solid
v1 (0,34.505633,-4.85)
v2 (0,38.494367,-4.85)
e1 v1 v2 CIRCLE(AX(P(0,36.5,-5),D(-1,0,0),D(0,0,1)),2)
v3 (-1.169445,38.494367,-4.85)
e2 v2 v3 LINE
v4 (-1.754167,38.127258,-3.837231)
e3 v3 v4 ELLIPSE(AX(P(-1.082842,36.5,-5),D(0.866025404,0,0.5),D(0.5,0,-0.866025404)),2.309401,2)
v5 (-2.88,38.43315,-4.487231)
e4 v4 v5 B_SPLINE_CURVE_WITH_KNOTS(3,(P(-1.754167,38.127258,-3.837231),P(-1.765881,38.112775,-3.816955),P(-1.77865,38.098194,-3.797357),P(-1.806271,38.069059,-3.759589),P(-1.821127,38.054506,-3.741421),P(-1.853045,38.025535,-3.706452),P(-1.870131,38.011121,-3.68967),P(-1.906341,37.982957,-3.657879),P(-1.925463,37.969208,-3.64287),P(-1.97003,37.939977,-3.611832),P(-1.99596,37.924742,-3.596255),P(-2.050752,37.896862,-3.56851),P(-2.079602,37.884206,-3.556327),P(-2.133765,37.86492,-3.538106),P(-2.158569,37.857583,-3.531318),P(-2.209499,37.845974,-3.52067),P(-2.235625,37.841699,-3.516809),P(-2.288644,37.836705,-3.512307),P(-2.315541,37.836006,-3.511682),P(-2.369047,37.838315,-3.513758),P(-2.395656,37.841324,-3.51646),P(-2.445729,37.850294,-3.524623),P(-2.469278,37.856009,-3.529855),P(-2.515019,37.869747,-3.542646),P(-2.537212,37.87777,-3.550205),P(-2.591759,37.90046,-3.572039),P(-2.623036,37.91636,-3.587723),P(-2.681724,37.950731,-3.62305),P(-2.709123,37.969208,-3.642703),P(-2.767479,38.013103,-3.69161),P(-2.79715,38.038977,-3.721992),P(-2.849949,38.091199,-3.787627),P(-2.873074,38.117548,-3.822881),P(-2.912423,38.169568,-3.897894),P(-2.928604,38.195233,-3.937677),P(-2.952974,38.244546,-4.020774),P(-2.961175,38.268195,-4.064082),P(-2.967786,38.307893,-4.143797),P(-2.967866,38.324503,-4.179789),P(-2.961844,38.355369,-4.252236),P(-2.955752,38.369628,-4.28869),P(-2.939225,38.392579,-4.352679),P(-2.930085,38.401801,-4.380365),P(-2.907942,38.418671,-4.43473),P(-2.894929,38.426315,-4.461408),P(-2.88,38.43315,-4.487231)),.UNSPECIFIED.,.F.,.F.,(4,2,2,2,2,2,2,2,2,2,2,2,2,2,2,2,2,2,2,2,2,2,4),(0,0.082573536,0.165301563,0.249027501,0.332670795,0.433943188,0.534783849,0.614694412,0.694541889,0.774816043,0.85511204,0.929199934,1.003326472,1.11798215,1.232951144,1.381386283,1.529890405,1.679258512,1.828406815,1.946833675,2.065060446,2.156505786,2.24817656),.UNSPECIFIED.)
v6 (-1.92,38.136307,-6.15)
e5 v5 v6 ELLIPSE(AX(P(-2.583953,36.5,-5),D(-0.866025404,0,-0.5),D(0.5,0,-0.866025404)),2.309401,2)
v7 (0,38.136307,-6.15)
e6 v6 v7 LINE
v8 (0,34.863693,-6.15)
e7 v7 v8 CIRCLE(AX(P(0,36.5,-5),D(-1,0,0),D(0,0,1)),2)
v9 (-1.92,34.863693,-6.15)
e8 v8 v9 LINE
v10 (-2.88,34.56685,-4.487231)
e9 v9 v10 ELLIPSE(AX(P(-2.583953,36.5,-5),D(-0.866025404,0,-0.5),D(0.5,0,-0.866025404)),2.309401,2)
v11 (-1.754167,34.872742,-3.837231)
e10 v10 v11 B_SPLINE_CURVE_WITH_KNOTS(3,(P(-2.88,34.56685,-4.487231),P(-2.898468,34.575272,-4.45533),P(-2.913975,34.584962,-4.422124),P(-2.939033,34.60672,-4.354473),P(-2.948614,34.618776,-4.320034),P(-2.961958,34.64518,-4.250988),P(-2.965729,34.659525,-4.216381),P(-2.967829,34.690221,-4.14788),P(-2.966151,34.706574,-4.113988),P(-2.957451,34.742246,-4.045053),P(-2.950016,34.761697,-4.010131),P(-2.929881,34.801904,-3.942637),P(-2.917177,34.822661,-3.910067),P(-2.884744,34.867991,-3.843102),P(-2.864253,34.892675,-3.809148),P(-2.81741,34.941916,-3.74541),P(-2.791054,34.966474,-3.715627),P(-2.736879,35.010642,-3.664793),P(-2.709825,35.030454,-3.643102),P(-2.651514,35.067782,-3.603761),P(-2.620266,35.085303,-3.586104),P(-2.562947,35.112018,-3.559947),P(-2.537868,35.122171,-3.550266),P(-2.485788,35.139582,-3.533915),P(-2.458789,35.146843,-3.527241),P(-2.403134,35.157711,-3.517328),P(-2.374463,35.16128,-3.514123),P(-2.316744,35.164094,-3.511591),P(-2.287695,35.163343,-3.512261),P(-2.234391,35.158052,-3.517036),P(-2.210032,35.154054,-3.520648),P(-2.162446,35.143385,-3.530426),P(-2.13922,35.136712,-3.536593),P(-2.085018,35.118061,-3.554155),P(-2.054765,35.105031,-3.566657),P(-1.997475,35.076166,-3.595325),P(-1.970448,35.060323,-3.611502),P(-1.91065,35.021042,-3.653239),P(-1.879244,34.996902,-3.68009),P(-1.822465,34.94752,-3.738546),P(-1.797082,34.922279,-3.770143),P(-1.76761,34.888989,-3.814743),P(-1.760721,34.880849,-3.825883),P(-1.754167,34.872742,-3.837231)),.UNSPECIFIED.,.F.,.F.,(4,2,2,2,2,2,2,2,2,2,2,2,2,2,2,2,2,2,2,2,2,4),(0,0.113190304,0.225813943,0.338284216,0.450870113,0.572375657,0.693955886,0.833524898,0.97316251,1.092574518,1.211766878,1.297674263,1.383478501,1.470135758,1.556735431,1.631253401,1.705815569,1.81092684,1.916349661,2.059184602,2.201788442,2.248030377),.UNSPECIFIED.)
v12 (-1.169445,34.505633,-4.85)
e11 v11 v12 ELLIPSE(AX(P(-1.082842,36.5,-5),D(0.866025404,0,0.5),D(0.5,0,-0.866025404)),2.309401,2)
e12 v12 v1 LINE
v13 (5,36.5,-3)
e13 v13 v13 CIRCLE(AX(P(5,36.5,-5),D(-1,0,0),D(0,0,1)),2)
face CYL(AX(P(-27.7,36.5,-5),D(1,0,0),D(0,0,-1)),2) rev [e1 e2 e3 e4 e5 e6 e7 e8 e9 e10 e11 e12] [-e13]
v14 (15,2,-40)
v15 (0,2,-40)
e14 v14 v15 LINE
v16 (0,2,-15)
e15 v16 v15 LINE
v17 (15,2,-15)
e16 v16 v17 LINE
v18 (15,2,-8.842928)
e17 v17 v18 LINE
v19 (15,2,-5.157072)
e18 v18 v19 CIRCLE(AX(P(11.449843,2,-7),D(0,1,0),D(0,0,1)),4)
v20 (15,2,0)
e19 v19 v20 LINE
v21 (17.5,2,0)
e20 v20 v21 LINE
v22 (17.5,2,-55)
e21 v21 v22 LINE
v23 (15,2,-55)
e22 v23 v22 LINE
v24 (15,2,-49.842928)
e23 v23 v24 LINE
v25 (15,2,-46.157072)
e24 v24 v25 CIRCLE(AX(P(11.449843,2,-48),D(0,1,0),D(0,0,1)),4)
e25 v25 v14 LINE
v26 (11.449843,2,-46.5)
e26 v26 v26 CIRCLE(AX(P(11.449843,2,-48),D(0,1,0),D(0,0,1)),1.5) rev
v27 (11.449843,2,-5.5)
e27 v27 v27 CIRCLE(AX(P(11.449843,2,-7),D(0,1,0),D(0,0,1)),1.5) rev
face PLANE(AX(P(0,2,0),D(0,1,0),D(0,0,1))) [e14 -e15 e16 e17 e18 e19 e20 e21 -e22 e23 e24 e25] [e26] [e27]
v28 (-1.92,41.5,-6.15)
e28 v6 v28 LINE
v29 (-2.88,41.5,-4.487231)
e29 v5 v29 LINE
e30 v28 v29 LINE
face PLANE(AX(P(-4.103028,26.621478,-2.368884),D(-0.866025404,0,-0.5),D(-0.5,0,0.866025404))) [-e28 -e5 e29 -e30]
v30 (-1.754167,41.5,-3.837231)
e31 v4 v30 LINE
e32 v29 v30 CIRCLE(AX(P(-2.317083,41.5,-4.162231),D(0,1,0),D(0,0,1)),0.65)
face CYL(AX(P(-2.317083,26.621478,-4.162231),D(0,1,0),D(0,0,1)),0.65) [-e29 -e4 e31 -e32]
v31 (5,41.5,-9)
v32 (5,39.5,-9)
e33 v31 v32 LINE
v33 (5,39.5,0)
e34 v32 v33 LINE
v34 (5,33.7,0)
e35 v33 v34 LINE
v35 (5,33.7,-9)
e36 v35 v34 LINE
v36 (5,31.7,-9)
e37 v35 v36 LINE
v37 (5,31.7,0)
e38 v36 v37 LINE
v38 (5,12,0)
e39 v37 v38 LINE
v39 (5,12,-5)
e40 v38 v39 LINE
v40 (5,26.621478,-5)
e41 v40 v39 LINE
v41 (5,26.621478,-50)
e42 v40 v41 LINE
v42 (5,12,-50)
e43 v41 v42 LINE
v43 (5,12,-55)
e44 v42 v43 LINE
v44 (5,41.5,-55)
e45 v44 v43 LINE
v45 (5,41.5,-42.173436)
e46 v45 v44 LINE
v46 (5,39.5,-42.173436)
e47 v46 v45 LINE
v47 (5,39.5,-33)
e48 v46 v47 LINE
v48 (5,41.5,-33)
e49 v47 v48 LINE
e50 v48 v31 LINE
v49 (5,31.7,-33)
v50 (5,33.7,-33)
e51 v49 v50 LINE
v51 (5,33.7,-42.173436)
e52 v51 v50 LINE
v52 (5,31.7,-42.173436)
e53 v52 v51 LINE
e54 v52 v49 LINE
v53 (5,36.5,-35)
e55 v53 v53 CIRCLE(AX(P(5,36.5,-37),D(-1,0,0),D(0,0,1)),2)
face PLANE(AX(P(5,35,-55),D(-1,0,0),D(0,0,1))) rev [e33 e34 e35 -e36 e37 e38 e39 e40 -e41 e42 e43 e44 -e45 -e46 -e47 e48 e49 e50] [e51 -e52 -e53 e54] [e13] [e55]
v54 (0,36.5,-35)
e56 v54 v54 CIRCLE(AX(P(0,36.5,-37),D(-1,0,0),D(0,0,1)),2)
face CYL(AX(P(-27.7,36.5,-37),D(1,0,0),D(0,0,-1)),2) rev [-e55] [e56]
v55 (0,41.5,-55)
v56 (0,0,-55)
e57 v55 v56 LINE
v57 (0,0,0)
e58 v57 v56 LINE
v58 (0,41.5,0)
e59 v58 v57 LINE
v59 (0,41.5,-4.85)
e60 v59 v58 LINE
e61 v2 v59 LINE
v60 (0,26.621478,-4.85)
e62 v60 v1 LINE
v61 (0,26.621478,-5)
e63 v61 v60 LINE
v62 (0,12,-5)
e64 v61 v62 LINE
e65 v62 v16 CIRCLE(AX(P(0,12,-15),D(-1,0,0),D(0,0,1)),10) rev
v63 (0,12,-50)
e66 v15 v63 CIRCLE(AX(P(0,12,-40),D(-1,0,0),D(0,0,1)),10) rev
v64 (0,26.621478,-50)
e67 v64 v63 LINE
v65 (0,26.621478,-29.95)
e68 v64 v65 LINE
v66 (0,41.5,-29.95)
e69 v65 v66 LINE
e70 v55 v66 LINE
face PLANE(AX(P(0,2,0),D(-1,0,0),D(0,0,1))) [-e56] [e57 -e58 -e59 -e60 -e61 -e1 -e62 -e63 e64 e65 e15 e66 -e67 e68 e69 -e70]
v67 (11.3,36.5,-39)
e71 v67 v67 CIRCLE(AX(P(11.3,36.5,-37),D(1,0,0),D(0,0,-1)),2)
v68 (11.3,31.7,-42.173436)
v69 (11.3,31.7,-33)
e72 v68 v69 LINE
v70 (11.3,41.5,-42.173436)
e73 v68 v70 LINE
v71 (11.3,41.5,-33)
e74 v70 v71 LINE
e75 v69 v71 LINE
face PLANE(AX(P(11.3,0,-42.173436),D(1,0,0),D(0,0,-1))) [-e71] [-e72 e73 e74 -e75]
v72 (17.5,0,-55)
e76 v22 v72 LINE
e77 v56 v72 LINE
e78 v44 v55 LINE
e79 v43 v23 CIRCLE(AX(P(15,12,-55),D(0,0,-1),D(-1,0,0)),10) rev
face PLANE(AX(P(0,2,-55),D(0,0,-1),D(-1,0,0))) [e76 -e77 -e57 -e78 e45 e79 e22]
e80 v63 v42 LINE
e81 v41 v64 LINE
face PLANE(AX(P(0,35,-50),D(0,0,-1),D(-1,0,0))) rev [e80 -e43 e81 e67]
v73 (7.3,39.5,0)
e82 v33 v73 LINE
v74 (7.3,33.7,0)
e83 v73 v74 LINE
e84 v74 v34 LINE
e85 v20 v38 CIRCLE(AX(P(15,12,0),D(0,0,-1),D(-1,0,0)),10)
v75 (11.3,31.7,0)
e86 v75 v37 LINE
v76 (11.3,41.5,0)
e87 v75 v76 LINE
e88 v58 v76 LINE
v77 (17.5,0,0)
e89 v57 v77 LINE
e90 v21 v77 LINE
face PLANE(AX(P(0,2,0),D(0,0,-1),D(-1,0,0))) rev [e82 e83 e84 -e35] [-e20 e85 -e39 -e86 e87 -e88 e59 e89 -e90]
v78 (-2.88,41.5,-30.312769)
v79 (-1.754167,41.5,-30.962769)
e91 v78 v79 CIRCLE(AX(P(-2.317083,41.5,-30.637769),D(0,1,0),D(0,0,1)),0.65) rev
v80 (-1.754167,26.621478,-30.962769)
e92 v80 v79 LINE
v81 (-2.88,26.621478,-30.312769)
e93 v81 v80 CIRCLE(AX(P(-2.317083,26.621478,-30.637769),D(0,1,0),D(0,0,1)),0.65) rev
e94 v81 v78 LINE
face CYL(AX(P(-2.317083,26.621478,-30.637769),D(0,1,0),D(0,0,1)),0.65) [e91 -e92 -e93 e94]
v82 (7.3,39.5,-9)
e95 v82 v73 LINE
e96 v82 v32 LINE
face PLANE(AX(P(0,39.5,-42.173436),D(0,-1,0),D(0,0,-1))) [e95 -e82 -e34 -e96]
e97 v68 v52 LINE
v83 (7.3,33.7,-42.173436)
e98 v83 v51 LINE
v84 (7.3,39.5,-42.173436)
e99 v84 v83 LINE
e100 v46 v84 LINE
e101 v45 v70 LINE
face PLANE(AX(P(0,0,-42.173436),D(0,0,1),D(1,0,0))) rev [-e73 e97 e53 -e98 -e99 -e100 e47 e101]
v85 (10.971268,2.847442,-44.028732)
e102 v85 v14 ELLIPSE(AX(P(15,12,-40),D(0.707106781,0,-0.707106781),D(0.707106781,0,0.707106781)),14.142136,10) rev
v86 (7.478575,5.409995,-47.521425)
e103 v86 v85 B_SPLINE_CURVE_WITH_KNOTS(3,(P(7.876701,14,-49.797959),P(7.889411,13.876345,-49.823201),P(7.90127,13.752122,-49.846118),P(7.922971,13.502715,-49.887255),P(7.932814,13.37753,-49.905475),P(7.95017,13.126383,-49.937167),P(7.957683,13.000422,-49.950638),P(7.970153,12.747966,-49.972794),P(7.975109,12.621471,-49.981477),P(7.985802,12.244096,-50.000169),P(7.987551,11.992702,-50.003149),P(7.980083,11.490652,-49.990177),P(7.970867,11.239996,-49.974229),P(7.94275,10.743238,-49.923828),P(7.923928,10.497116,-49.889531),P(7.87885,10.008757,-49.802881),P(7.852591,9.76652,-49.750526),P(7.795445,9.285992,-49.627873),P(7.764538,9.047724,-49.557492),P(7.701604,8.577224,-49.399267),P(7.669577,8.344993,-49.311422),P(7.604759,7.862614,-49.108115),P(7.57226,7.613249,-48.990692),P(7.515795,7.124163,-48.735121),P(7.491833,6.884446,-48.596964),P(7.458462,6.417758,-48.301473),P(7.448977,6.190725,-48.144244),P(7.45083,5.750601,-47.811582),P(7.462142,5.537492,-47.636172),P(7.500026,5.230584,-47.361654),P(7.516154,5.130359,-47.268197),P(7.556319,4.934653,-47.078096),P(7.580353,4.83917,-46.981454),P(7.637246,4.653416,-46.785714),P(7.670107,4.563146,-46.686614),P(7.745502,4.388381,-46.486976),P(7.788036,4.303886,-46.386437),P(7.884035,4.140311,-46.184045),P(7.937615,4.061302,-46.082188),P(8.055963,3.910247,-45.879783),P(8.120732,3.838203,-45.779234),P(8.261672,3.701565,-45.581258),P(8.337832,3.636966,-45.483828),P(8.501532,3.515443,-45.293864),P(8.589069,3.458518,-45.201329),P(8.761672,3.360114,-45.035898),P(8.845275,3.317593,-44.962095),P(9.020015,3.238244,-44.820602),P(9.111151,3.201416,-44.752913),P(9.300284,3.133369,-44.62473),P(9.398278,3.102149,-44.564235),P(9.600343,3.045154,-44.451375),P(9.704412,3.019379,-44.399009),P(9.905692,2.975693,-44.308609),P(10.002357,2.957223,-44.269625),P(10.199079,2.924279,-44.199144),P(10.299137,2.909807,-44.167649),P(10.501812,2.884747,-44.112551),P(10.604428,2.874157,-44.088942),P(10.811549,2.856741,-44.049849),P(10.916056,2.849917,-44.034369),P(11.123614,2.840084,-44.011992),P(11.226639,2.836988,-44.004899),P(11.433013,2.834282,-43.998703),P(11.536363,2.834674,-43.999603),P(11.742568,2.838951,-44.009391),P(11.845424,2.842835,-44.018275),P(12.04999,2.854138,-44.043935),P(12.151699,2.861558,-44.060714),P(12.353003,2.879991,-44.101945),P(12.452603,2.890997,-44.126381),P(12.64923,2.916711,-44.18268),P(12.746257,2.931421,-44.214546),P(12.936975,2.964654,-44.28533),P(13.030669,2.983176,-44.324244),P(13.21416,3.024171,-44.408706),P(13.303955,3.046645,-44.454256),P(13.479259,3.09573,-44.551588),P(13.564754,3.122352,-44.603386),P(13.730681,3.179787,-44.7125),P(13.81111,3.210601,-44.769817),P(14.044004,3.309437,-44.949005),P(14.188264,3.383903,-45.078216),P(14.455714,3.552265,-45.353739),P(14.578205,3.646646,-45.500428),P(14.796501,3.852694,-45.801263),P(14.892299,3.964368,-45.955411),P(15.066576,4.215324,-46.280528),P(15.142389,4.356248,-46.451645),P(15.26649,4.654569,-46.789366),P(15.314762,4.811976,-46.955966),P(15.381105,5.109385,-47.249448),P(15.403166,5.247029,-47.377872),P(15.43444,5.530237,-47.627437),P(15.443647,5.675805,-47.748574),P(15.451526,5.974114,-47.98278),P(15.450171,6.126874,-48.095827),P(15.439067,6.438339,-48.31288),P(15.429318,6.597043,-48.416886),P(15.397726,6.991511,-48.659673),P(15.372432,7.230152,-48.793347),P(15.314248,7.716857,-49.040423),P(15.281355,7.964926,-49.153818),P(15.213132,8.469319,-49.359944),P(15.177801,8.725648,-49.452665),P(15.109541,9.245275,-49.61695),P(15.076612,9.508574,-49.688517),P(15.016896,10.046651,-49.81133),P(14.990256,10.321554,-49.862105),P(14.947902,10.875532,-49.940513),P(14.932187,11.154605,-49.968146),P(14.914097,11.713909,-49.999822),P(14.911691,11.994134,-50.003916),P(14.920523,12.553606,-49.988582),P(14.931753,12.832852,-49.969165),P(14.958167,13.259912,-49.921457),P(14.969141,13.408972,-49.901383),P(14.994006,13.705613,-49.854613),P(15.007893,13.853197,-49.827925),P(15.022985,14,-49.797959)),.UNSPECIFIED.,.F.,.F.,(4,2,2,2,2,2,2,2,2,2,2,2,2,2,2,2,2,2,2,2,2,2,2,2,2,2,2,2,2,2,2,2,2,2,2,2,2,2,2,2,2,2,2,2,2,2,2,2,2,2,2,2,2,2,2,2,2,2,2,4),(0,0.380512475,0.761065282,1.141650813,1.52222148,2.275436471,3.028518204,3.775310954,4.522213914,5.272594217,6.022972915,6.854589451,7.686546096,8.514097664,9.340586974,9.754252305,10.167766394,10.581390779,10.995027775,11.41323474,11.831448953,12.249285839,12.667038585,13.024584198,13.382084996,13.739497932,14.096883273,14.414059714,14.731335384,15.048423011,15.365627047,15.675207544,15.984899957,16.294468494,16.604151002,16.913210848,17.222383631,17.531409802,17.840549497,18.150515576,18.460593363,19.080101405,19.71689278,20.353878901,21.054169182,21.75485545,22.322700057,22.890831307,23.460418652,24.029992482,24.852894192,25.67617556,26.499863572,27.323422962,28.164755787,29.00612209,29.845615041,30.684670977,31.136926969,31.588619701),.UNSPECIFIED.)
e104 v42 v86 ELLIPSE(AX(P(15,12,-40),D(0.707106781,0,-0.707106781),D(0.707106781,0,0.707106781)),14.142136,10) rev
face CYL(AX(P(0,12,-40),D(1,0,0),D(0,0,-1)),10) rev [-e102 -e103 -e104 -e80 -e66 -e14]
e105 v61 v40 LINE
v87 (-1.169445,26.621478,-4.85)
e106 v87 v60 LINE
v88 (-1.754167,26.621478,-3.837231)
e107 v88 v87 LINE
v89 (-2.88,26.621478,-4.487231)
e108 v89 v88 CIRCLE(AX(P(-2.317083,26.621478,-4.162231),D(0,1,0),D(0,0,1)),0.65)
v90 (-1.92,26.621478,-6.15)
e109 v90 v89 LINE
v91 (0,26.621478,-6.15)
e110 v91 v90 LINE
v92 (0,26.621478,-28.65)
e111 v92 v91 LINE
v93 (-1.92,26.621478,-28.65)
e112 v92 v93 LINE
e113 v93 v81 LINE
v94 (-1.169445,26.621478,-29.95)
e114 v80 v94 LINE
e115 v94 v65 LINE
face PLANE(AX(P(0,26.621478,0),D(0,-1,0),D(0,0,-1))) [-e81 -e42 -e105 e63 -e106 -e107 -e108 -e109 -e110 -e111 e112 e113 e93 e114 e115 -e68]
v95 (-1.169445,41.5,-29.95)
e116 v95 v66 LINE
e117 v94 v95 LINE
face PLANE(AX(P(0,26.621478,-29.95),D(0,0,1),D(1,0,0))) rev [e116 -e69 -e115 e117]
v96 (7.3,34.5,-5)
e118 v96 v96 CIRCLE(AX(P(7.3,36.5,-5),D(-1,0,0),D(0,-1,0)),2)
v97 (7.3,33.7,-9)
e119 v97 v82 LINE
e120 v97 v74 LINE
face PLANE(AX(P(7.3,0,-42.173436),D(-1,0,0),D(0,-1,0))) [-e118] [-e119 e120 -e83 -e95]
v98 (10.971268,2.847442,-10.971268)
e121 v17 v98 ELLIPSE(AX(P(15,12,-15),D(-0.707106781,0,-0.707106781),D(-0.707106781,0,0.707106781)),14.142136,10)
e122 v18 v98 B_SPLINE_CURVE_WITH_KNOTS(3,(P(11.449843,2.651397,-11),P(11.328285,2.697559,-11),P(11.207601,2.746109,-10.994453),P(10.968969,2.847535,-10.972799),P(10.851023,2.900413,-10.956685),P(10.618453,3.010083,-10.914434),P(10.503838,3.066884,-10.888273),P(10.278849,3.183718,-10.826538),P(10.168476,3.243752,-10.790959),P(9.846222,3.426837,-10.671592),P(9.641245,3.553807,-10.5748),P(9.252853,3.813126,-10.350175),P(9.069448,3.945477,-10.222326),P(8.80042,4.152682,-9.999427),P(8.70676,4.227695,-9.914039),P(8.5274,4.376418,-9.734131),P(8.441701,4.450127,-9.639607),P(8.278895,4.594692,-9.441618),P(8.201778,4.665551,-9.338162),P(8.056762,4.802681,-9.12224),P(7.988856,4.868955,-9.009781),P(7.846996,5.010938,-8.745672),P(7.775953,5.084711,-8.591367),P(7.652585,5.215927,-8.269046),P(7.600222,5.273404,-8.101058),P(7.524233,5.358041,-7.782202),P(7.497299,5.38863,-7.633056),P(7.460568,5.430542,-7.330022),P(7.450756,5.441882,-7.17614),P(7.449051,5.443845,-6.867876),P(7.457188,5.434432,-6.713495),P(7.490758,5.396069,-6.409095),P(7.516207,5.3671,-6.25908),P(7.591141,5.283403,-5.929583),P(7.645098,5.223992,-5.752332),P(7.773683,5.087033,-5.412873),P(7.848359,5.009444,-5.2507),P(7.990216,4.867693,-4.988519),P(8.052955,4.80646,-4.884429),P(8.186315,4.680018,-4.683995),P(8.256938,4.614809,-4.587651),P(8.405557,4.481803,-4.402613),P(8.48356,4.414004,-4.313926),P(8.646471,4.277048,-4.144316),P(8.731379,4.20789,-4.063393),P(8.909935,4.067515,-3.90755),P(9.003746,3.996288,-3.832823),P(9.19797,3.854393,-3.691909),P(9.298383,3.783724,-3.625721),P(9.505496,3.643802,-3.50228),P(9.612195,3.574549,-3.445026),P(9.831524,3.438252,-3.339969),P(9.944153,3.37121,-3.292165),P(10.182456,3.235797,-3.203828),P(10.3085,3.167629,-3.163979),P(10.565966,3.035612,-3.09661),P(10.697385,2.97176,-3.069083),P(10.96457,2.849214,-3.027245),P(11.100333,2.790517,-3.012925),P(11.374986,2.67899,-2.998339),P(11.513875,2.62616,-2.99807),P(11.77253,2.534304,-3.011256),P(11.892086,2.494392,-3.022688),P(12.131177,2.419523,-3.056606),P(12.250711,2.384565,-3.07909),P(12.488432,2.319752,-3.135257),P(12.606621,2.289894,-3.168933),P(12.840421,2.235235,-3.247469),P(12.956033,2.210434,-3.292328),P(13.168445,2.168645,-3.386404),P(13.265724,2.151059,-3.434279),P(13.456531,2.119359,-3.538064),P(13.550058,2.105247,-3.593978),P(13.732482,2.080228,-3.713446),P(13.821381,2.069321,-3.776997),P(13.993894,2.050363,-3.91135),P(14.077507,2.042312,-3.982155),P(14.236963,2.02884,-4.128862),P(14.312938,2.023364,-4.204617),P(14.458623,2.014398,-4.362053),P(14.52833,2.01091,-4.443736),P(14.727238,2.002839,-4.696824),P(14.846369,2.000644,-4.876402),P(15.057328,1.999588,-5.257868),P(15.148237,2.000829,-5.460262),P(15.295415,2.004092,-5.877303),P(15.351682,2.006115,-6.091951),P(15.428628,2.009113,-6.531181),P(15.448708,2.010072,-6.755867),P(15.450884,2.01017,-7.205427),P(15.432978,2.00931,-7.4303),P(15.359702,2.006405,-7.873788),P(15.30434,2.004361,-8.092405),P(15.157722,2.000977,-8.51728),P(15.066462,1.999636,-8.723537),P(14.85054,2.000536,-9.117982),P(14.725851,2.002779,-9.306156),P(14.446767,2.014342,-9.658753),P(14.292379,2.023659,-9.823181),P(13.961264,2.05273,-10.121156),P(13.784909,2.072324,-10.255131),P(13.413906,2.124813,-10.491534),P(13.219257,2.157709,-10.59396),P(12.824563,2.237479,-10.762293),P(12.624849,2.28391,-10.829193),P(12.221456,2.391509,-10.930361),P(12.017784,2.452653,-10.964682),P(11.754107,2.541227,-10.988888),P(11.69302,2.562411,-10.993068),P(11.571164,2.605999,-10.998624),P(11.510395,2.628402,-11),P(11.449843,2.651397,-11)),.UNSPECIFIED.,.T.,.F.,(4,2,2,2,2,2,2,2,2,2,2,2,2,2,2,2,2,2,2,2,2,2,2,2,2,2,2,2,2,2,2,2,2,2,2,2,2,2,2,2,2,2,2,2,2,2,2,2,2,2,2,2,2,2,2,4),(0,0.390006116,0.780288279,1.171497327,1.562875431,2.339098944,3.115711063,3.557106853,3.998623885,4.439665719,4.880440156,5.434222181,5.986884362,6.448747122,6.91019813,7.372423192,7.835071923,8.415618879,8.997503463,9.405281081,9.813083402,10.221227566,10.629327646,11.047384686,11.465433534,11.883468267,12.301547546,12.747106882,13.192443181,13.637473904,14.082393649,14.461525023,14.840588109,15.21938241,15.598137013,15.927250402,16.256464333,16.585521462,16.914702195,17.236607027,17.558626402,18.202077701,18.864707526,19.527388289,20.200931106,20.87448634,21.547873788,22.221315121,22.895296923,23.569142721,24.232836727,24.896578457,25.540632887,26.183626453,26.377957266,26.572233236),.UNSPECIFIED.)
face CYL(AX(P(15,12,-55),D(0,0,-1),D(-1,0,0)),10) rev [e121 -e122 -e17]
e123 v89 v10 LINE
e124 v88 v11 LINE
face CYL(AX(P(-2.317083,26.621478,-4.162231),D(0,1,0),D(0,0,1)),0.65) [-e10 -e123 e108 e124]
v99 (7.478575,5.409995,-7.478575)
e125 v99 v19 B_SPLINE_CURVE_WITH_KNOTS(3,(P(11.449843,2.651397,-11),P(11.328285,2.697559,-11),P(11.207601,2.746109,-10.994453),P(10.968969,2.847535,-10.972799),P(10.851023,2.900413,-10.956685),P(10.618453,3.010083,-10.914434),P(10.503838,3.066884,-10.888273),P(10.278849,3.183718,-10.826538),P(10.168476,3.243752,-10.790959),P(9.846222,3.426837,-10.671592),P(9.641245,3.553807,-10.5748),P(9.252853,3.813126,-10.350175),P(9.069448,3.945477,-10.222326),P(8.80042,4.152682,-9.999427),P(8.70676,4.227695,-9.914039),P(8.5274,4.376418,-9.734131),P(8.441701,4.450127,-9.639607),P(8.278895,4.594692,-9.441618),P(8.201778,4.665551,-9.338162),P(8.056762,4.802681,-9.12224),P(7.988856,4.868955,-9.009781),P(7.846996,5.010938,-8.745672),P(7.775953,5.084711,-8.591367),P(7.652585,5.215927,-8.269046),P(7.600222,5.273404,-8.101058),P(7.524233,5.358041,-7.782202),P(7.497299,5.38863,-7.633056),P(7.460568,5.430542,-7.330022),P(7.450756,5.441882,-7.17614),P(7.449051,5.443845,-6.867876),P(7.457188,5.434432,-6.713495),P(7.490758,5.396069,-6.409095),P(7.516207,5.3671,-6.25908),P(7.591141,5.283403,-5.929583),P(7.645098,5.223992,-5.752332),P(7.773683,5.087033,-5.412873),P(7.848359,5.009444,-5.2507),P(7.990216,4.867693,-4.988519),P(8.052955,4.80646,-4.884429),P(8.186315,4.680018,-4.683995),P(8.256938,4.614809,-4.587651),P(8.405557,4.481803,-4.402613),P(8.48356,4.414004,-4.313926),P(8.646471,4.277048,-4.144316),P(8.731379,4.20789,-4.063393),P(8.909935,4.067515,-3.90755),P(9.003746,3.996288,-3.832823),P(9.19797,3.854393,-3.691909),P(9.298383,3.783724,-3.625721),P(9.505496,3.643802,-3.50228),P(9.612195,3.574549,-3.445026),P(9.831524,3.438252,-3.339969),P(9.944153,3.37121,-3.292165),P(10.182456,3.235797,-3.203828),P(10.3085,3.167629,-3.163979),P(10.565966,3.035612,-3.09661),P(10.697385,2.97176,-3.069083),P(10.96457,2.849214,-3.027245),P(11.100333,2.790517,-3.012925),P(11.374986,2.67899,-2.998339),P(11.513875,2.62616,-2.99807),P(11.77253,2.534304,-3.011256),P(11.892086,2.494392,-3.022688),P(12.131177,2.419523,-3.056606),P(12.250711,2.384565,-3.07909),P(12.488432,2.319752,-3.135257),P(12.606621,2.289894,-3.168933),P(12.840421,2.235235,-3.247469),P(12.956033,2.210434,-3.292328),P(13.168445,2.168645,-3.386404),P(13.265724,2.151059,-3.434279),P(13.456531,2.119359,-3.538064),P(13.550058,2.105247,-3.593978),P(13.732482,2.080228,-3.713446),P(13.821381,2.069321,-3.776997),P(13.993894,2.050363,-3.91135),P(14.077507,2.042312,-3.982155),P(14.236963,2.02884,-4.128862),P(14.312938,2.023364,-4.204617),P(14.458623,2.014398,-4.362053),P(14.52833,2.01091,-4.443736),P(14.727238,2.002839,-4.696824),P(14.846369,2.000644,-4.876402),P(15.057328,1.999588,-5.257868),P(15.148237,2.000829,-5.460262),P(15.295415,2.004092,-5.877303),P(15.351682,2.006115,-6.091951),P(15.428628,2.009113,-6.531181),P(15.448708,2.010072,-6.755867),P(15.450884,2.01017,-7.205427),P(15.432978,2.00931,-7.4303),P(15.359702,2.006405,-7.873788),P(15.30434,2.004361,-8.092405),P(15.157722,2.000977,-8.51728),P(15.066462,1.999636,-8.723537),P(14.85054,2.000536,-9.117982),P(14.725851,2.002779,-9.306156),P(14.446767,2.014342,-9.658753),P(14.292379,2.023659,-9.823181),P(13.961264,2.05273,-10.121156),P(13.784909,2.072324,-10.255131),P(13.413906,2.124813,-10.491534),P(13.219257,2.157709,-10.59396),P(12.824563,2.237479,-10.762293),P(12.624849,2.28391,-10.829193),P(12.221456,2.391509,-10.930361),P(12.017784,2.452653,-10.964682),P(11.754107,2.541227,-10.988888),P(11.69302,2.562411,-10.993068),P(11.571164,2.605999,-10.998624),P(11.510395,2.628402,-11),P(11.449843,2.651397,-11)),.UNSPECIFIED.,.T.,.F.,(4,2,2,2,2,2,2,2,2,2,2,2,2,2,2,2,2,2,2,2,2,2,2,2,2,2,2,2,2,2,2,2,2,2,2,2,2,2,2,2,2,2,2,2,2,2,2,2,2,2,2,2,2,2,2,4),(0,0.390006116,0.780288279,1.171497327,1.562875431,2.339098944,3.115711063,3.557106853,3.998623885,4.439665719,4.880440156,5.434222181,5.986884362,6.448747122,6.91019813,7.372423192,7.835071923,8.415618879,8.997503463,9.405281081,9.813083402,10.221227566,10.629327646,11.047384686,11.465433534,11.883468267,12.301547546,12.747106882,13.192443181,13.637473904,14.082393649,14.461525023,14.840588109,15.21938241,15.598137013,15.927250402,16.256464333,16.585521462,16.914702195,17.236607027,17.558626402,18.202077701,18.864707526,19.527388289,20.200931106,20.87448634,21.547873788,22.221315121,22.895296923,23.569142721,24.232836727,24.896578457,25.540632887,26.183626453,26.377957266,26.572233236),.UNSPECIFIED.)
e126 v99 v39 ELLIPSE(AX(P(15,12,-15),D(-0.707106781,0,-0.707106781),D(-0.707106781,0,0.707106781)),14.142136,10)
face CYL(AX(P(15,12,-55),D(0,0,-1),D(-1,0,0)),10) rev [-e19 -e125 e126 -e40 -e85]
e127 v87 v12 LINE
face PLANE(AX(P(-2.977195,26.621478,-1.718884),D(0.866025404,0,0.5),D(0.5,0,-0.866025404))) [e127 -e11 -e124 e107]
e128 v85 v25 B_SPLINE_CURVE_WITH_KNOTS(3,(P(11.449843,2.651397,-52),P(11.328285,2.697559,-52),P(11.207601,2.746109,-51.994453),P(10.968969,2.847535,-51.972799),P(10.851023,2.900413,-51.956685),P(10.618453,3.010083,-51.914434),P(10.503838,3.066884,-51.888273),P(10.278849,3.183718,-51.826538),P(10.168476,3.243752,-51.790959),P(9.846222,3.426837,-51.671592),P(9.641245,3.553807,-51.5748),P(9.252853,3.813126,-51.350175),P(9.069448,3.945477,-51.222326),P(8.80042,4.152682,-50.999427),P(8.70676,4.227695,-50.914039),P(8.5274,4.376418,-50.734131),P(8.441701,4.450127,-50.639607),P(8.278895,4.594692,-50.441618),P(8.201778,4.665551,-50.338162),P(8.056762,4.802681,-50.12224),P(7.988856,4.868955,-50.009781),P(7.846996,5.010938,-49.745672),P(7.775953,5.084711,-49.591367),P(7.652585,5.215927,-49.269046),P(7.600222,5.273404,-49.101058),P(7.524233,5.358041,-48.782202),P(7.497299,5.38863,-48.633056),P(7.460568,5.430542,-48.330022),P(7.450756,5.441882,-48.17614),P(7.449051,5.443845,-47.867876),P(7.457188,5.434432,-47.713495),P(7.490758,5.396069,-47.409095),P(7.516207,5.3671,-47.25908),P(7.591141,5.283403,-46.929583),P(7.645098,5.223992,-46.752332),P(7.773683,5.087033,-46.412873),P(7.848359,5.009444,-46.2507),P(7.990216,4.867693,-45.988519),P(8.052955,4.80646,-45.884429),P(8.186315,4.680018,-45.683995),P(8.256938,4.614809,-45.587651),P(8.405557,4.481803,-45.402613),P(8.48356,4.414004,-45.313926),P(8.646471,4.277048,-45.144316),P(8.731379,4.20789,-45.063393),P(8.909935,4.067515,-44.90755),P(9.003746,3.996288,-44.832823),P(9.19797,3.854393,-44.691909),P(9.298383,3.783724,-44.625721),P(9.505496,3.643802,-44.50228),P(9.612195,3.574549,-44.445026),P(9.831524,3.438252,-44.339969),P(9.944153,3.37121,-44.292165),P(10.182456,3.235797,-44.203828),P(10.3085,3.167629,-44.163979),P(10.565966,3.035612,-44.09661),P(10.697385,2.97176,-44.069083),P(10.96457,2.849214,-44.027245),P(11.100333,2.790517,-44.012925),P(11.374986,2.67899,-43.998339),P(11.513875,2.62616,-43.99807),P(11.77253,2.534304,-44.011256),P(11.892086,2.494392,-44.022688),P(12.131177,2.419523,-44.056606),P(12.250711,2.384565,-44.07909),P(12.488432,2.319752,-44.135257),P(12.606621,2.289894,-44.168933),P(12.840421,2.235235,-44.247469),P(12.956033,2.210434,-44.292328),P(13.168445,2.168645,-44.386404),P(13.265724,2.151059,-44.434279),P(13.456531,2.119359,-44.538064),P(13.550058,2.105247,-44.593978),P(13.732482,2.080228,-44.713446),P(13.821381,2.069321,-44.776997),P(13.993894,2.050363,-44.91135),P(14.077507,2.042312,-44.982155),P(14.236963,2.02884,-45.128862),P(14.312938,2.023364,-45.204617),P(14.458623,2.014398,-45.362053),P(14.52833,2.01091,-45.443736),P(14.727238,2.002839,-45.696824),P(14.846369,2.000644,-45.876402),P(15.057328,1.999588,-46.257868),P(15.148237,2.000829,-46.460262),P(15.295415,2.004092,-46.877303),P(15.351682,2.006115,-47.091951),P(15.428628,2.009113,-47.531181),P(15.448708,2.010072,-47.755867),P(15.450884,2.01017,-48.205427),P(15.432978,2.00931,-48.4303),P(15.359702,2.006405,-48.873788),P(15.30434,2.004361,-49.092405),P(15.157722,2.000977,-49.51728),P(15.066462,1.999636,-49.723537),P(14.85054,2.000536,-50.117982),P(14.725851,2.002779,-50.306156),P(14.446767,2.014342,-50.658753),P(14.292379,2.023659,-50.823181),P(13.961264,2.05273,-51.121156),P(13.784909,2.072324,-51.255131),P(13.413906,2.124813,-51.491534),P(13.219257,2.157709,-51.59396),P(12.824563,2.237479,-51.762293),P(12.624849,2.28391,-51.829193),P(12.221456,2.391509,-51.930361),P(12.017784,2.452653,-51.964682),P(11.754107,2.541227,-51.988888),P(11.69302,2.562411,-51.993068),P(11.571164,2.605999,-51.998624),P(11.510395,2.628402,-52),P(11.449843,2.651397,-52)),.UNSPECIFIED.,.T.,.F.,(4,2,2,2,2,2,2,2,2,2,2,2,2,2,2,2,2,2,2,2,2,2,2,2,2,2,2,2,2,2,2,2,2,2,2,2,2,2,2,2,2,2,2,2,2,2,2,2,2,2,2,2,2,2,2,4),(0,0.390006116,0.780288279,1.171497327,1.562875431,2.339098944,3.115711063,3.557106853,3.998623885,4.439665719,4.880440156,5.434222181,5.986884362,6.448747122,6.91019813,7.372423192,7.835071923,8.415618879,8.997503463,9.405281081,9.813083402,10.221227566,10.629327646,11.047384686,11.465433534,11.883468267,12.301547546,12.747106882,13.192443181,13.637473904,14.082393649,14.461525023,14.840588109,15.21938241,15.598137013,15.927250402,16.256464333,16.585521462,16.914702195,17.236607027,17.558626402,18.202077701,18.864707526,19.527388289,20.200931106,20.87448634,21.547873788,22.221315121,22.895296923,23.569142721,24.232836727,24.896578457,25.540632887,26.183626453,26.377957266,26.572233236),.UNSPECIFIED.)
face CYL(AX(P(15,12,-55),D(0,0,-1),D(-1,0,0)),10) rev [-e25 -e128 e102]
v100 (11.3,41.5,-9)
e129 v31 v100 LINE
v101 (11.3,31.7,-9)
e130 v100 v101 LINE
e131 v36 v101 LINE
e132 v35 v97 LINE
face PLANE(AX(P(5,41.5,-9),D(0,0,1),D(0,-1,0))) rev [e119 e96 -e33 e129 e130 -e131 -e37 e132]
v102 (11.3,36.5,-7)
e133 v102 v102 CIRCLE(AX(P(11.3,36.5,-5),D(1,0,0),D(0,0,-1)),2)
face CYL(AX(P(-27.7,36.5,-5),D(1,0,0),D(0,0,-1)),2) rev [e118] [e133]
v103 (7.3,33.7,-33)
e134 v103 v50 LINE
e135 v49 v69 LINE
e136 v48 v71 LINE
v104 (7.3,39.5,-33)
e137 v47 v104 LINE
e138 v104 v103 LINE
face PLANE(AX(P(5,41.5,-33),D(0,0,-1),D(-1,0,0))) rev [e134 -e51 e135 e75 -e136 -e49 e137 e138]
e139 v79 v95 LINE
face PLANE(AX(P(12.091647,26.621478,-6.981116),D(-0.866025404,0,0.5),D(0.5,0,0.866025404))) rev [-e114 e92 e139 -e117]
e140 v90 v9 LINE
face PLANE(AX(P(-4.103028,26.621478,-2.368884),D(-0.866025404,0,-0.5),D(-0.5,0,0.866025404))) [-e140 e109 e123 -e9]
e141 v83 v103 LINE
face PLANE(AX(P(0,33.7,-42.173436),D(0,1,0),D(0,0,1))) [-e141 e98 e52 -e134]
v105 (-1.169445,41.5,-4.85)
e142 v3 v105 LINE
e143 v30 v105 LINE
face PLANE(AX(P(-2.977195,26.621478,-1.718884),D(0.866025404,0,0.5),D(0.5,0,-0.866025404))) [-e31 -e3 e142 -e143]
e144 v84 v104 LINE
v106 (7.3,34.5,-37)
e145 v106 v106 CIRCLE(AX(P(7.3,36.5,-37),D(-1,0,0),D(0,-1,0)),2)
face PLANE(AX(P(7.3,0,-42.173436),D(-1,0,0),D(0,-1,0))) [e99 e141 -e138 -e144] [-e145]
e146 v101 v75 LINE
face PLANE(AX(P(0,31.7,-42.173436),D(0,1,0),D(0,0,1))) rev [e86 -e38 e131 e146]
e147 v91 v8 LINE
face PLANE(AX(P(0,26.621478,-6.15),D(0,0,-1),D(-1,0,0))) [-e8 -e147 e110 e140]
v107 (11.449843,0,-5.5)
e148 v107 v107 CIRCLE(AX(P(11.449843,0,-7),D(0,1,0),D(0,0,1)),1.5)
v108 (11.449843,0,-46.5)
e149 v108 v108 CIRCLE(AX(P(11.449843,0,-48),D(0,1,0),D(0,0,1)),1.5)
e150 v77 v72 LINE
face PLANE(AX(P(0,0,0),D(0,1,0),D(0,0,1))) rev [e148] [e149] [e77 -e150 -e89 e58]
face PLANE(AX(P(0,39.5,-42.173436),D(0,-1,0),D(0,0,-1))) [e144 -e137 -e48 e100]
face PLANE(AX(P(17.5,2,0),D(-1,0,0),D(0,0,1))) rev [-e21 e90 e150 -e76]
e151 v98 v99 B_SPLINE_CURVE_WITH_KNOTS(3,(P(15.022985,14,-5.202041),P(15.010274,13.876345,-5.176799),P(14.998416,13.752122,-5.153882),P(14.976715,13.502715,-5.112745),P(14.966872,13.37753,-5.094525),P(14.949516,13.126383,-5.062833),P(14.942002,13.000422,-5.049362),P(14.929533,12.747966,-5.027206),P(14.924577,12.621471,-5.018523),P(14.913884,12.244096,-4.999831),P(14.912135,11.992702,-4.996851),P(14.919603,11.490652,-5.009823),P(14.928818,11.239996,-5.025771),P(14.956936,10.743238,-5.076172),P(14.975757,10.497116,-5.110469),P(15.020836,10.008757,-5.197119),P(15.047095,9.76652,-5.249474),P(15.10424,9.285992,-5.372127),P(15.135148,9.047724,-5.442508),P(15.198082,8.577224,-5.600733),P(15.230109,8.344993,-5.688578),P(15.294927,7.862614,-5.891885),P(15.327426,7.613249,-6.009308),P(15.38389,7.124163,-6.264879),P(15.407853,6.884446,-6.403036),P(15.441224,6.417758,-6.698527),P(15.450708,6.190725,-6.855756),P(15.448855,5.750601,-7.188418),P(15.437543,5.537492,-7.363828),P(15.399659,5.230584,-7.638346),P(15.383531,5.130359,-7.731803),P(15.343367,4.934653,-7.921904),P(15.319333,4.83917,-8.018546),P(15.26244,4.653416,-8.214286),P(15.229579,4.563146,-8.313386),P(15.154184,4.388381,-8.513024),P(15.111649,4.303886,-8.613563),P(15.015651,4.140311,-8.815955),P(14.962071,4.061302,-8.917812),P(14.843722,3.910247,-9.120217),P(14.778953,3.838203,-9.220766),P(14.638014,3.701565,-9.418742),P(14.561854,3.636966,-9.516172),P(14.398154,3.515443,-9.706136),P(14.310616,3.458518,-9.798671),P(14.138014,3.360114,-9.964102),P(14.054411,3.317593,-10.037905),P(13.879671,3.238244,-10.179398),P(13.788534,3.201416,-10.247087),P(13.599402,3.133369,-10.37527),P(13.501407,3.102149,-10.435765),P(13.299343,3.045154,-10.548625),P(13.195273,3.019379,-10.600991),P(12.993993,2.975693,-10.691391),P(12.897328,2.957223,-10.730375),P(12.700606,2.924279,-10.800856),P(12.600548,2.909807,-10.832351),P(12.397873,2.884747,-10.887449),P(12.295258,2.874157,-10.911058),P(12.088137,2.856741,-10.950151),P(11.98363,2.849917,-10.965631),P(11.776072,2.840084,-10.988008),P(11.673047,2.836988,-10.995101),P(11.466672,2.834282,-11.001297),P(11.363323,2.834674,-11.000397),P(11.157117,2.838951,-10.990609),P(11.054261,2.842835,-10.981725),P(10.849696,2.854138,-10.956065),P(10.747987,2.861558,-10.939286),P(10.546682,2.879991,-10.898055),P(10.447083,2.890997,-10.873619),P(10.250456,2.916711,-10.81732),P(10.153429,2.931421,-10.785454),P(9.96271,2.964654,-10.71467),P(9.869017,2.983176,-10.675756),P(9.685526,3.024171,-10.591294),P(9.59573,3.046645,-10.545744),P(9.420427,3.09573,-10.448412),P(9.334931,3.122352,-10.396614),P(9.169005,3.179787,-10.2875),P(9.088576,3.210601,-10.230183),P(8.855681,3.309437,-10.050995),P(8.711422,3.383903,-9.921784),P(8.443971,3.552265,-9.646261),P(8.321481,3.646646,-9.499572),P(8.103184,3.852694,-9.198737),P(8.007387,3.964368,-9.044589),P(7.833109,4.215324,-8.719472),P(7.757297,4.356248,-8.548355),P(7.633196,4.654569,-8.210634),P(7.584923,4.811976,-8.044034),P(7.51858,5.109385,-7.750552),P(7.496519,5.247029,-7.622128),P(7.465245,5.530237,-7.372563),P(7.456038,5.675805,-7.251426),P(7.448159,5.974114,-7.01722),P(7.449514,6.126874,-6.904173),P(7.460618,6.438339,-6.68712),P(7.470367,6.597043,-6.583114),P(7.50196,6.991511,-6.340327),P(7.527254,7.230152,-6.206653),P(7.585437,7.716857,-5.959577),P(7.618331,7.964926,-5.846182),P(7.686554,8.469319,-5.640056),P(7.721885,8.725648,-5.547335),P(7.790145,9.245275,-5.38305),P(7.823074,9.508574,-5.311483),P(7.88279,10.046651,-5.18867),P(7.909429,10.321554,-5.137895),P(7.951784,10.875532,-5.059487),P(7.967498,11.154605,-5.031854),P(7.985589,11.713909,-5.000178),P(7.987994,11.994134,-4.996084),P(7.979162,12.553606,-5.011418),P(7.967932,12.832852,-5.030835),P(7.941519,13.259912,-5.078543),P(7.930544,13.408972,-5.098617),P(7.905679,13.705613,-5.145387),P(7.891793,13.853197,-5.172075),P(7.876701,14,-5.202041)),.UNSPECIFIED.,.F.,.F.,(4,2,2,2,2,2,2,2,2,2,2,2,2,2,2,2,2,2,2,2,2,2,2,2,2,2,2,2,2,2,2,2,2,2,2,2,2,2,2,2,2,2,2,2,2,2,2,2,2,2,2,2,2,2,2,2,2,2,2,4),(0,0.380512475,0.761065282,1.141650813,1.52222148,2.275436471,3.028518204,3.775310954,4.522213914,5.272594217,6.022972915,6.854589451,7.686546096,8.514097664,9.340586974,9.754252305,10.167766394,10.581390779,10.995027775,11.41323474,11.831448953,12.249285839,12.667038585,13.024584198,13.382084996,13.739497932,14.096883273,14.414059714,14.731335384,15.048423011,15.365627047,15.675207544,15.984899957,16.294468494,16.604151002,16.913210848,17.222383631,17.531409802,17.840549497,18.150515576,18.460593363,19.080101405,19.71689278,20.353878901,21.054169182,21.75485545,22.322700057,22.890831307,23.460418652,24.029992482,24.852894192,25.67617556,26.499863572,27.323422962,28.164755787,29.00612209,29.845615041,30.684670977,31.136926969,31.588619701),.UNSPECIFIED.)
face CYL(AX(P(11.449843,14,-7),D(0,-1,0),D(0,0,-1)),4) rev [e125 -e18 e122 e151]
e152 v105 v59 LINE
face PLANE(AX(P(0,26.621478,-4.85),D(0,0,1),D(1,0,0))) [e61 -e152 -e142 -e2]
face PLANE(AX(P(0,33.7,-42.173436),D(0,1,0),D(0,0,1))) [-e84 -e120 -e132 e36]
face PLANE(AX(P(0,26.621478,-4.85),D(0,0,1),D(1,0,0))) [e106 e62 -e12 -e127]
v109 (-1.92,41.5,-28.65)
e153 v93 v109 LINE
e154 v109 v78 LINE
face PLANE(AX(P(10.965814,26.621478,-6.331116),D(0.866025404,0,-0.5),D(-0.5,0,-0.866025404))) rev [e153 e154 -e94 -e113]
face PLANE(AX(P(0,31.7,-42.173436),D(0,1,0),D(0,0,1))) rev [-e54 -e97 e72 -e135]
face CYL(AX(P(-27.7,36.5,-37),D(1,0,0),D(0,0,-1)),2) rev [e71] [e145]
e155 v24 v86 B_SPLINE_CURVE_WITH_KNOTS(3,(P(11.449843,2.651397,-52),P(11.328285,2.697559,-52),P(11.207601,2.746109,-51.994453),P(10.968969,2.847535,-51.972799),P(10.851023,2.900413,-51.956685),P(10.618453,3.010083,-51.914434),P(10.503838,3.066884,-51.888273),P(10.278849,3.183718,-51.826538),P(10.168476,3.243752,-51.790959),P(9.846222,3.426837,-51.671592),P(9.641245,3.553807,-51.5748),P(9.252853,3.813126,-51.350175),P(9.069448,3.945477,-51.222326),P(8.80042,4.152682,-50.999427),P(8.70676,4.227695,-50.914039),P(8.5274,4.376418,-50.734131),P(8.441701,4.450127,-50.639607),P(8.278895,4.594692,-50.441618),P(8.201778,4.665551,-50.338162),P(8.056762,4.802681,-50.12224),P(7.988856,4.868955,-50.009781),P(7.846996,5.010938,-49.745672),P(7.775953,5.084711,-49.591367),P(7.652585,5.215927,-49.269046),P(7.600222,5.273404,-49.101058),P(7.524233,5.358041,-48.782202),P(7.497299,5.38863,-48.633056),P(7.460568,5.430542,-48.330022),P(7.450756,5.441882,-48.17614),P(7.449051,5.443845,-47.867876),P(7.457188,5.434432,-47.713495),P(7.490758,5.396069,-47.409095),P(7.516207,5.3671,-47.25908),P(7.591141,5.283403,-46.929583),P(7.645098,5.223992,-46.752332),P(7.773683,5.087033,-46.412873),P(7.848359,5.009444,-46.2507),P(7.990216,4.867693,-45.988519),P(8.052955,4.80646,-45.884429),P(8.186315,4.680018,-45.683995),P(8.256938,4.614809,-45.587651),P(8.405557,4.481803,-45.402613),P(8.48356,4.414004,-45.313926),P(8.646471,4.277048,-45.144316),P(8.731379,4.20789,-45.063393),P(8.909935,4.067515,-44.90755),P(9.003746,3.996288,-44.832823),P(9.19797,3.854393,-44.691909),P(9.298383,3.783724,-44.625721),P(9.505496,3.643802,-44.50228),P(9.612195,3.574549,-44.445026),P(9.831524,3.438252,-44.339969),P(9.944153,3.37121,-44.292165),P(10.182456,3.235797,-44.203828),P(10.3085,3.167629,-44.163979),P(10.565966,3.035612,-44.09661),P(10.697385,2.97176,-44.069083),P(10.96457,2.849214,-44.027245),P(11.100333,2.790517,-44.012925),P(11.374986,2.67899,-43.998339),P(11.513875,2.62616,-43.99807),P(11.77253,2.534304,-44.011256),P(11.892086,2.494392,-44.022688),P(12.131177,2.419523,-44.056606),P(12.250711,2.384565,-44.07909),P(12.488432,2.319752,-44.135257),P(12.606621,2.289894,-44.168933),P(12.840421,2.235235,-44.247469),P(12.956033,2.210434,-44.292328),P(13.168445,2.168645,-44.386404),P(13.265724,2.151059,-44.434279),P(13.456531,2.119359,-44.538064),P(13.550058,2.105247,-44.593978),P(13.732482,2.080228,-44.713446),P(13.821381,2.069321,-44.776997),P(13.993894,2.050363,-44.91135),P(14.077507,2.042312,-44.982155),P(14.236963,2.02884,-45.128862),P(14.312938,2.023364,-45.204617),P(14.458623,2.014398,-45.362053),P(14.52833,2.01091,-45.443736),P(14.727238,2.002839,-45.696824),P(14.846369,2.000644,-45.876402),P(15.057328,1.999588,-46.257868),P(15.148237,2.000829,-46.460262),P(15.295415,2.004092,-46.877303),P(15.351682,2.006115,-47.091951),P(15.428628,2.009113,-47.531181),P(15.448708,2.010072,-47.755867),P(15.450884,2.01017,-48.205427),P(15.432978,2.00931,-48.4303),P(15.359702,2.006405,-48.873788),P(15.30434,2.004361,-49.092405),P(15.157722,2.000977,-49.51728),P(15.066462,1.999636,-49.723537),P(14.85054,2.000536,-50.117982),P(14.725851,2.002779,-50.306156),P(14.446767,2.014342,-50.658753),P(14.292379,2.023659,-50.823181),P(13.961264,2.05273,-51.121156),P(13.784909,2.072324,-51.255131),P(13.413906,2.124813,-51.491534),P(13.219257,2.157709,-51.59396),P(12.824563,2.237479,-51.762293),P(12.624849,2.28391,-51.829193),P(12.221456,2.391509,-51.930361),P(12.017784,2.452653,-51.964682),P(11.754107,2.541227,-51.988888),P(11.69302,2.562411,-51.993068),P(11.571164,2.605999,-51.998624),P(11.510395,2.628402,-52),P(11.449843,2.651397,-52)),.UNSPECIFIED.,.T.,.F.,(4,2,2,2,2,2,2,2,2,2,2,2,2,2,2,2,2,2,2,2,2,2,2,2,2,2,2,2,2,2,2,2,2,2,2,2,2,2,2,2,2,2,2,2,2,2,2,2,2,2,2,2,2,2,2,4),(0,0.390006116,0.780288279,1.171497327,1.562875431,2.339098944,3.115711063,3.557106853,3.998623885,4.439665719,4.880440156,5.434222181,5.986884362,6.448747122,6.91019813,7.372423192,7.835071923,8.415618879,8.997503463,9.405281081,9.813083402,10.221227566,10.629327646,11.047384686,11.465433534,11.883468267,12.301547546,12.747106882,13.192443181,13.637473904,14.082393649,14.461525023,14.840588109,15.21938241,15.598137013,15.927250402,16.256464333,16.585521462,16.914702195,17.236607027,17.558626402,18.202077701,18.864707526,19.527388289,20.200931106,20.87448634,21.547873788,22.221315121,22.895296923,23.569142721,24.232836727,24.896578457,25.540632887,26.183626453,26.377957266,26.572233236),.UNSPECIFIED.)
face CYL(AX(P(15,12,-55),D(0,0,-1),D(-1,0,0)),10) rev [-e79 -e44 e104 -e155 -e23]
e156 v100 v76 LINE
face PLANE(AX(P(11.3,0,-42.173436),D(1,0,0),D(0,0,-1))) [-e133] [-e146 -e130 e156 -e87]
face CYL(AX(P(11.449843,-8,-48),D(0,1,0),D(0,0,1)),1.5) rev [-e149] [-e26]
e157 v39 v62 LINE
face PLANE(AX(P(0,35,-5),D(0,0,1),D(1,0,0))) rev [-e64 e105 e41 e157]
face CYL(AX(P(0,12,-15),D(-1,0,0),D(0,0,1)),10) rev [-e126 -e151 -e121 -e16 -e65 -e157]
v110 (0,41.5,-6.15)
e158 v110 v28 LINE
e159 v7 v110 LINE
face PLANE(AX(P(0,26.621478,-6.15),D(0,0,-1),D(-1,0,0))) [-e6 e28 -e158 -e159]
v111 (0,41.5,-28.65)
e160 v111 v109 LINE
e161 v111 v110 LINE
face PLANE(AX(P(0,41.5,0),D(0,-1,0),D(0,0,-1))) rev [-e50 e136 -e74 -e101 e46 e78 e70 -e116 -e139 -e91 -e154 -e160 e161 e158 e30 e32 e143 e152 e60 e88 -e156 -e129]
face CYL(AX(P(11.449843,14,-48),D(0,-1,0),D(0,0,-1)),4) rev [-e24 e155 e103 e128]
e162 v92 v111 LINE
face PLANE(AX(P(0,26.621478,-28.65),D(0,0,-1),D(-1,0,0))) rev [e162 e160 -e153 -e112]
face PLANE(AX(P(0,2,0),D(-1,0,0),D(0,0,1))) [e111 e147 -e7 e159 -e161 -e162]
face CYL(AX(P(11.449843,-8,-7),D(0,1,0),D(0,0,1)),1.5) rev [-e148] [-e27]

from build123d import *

# Parameters (mm, degrees)
SKETCH_1_W               = 17.5
SKETCH_1_H               = 55
EXTRUDE_1_DEPTH          = 2
SKETCH_2_W               = 5
SKETCH_2_H               = 5
EXTRUDE_2_DEPTH          = 33
EXTRUDE_3_DEPTH          = 6.5
EXTRUDE_3_DEPTH_BACK     = 8.378522314
SKETCH_3_W               = 5
SKETCH_3_H               = 55
SKETCH_4_R               = 1.5
CUT_EXTRUDE_1_DEPTH      = 10
FILLET_1_R               = 10
SKETCH_5_R               = 4
CUT_EXTRUDE_2_DEPTH      = 12
EXTRUDE_START            = -14.878522
EXTRUDE_4_DEPTH          = 14.878522
SKETCH_7_W               = 4
SKETCH_7_H               = 2
SKETCH_7_W_2             = 2.3
SKETCH_7_H_2             = 5.8
EXTRUDE_5_DEPTH          = 42.173435595
SKETCH_9_R               = 2
CUT_EXTRUDE_15_DEPTH     = 39
CUT_EXTRUDE_START        = -6.3
CUT_EXTRUDE_16_OUTLINE_W = 24
CUT_EXTRUDE_16_OUTLINE_H = 9.8
CUT_EXTRUDE_16_DEPTH     = 6.3


# Read off the part's stored shape, not the designer's step: Вырез-Вытянуть16
with BuildPart() as part:
    # Эскиз1 → Бобышка-Вытянуть1 (new body)
    with BuildSketch(Plane(origin=(0, 0, 0), x_dir=(1, 0, 0), z_dir=(0, 1, 0))):
        with Locations((8.75, 27.5)):
            Rectangle(SKETCH_1_W, SKETCH_1_H)
    extrude(amount=EXTRUDE_1_DEPTH)

    # Эскиз2 → Бобышка-Вытянуть2 (add)
    with BuildSketch(Plane(origin=(0, 2, 0), x_dir=(1, 0, 0), z_dir=(0, 1, 0))):
        with Locations((2.5, 52.5)):
            Rectangle(SKETCH_2_W, SKETCH_2_H)
        with Locations((2.5, 2.5)):
            Rectangle(SKETCH_2_W, SKETCH_2_H)
    extrude(amount=EXTRUDE_2_DEPTH)

    # Эскиз3 → Бобышка-Вытянуть3 (add, two sides: drawn at the far end of the back side and taken through both)
    with BuildSketch(Plane(origin=(0, 35, 0), x_dir=(1, 0, 0), z_dir=(0, 1, 0)).offset(-EXTRUDE_3_DEPTH_BACK)):
        with Locations((2.5, 27.5)):
            Rectangle(SKETCH_3_W, SKETCH_3_H)
    extrude(amount=EXTRUDE_3_DEPTH + EXTRUDE_3_DEPTH_BACK)

    # Эскиз4 → Вырез-Вытянуть1 (cut)
    with BuildSketch(Plane(origin=(0, 2, 0), x_dir=(1, 0, 0), z_dir=(0, 1, 0))):
        with Locations(Location((11.449842766, 48, 0), (0, 0, 270))):
            Circle(SKETCH_4_R)
        with Locations(Location((11.449842766, 7, 0), (0, 0, 270))):
            Circle(SKETCH_4_R)
    extrude(amount=-CUT_EXTRUDE_1_DEPTH, mode=Mode.SUBTRACT)

    # Скругление1
    # the kernel refuses this fillet: 10 mm, written as the material it adds along each edge
    with BuildSketch(Plane(origin=(5, 2, -50), x_dir=(0, 0, 1), z_dir=(-1, 0, 0)), Plane(origin=(5, 2, 0), x_dir=(0, 1, 0), z_dir=(0, 0, -1))) as fillet_1_piece_1:
        with BuildLine():
            CenterArc((FILLET_1_R, FILLET_1_R), FILLET_1_R, 180, 90)
            Line((0, FILLET_1_R), (0, 0))
            Line((0, 0), (FILLET_1_R, 0))
        make_face()
    extrude(amount=5)
    with BuildSketch(Plane(origin=(5, 2, -55), x_dir=(0, 1, 0), z_dir=(0, 0, 1)), Plane(origin=(5, 2, -5), x_dir=(0, 0, -1), z_dir=(-1, 0, 0))) as fillet_1_piece_2:
        with BuildLine():
            CenterArc((FILLET_1_R, -FILLET_1_R), FILLET_1_R, 90, 90)
            Line((0, -FILLET_1_R), (0, 0))
            Line((0, 0), (FILLET_1_R, 0))
        make_face()
    extrude(amount=5)
    with BuildSketch(Plane(origin=(5, 2, -55), x_dir=(0, 1, 0), z_dir=(0, 0, 1))) as fillet_1_piece_3a_section:
        with BuildLine():
            CenterArc((FILLET_1_R, -FILLET_1_R), FILLET_1_R, 90, 90)
            Line((0, -FILLET_1_R), (0, 0))
            Line((0, 0), (FILLET_1_R, 0))
        make_face()
    fillet_1_piece_3a = extrude(amount=30, mode=Mode.PRIVATE)
    fillet_1_piece_3a = split(fillet_1_piece_3a, bisect_by=Plane(origin=(7.224830191, 4.283537978, -50), z_dir=(0, 0, 1)), keep=Keep.TOP, mode=Mode.PRIVATE)
    fillet_1_piece_3a = fillet_1_piece_3a - Plane(origin=(11.449842766, 4.283537978, -48), x_dir=(0, 0, 1), z_dir=(0, 1, 0)) * Cylinder(1.5, 100, mode=Mode.PRIVATE)
    with BuildSketch(Plane(origin=(30, 2, -50), x_dir=(0, 0, 1), z_dir=(-1, 0, 0))) as fillet_1_piece_3b_section:
        with BuildLine():
            CenterArc((FILLET_1_R, FILLET_1_R), FILLET_1_R, 180, 90)
            Line((0, FILLET_1_R), (0, 0))
            Line((0, 0), (FILLET_1_R, 0))
        make_face()
    fillet_1_piece_3b = extrude(amount=30, mode=Mode.PRIVATE)
    fillet_1_piece_3b = split(fillet_1_piece_3b, bisect_by=Plane(origin=(5, 2.276950555, -42.605283247), z_dir=(1, 0, 0)), keep=Keep.TOP, mode=Mode.PRIVATE)
    fillet_1_piece_3b = split(fillet_1_piece_3b, bisect_by=Plane(origin=(17.5, 2.276950555, -42.605283247), z_dir=(-1, 0, 0)), keep=Keep.TOP, mode=Mode.PRIVATE)
    fillet_1_piece_3b = fillet_1_piece_3b - Plane(origin=(11.449842766, 2.276950555, -48), x_dir=(0, 0, 1), z_dir=(0, 1, 0)) * Cylinder(1.5, 100, mode=Mode.PRIVATE)
    fillet_1_piece_3 = fillet_1_piece_3a & fillet_1_piece_3b
    add(fillet_1_piece_3)
    with BuildSketch(Plane(origin=(5, 2, 0), x_dir=(0, 1, 0), z_dir=(0, 0, -1))) as fillet_1_piece_4a_section:
        with BuildLine():
            CenterArc((FILLET_1_R, FILLET_1_R), FILLET_1_R, 180, 90)
            Line((0, FILLET_1_R), (0, 0))
            Line((0, 0), (FILLET_1_R, 0))
        make_face()
    fillet_1_piece_4a = extrude(amount=30, mode=Mode.PRIVATE)
    fillet_1_piece_4a = split(fillet_1_piece_4a, bisect_by=Plane(origin=(7.224831151, 4.283537771, -5), z_dir=(0, 0, -1)), keep=Keep.TOP, mode=Mode.PRIVATE)
    fillet_1_piece_4a = fillet_1_piece_4a - Plane(origin=(11.449842766, 4.283537771, -7), x_dir=(0, 0, 1), z_dir=(0, 1, 0)) * Cylinder(1.5, 100, mode=Mode.PRIVATE)
    with BuildSketch(Plane(origin=(30, 2, -5), x_dir=(0, 0, -1), z_dir=(-1, 0, 0))) as fillet_1_piece_4b_section:
        with BuildLine():
            CenterArc((FILLET_1_R, -FILLET_1_R), FILLET_1_R, 90, 90)
            Line((0, -FILLET_1_R), (0, 0))
            Line((0, 0), (FILLET_1_R, 0))
        make_face()
    fillet_1_piece_4b = extrude(amount=30, mode=Mode.PRIVATE)
    fillet_1_piece_4b = split(fillet_1_piece_4b, bisect_by=Plane(origin=(5, 2.276949142, -12.394716375), z_dir=(1, 0, 0)), keep=Keep.TOP, mode=Mode.PRIVATE)
    fillet_1_piece_4b = split(fillet_1_piece_4b, bisect_by=Plane(origin=(17.5, 2.276949142, -12.394716375), z_dir=(-1, 0, 0)), keep=Keep.TOP, mode=Mode.PRIVATE)
    fillet_1_piece_4b = fillet_1_piece_4b - Plane(origin=(11.449842766, 2.276949142, -7), x_dir=(0, 0, 1), z_dir=(0, 1, 0)) * Cylinder(1.5, 100, mode=Mode.PRIVATE)
    fillet_1_piece_4 = fillet_1_piece_4a & fillet_1_piece_4b
    add(fillet_1_piece_4)

    # Эскиз5 → Вырез-Вытянуть2 (cut)
    with BuildSketch(Plane(origin=(0, 2, 0), x_dir=(1, 0, 0), z_dir=(0, 1, 0))):
        with Locations((11.449842766, 48)):
            Circle(SKETCH_5_R)
        with Locations((11.449842766, 7)):
            Circle(SKETCH_5_R)
    extrude(amount=CUT_EXTRUDE_2_DEPTH, mode=Mode.SUBTRACT)

    # Эскиз6 → Бобышка-Вытянуть4 (add)
    with BuildSketch(Plane(origin=(0, 41.5, 0), x_dir=(1, 0, 0), z_dir=(0, 1, 0)).offset(EXTRUDE_START)):
        with BuildLine():
            Line((0, 4.85), (0, 6.15))
            Line((0, 6.15), (-1.92, 6.15))
            Line((-1.92, 6.15), (-2.88, 4.487231225))
            ThreePointArc((-2.88, 4.487231225), (-2.642083488, 3.599314712), (-1.754166975, 3.837231225))
            Line((-1.754166975, 3.837231225), (-1.16944465, 4.85))
            Line((-1.16944465, 4.85), (0, 4.85))
        make_face()
        with BuildLine():
            Line((0, 28.65), (0, 29.95))
            Line((0, 29.95), (-1.16944465, 29.95))
            Line((-1.16944465, 29.95), (-1.754166975, 30.962768775))
            ThreePointArc((-1.754166975, 30.962768775), (-2.642083488, 31.200685288), (-2.88, 30.312768775))
            Line((-2.88, 30.312768775), (-1.92, 28.65))
            Line((-1.92, 28.65), (0, 28.65))
        make_face()
    extrude(amount=EXTRUDE_4_DEPTH)

    # Эскиз7 → Бобышка-Вытянуть5 (add)
    with BuildSketch(Plane.XY):
        with Locations((9.3, 40.5)):
            Rectangle(SKETCH_7_W, SKETCH_7_H)
        with Locations((6.15, 40.5)):
            Rectangle(SKETCH_7_W_2, SKETCH_7_H)
        with Locations((9.3, 36.6)):
            Rectangle(SKETCH_7_W, SKETCH_7_H_2)
        Polygon((7.3, 33.7), (5, 33.7), (5, 31.7), (11.3, 31.7), (11.3, 33.7), align=None)
    extrude(amount=-EXTRUDE_5_DEPTH)

    # Эскиз9 → Вырез-Вытянуть15 (cut)
    with BuildSketch(Plane(origin=(11.3, 0, 0), x_dir=(0, 0, -1), z_dir=(1, 0, 0))):
        with Locations((37, 36.5)):
            Circle(SKETCH_9_R)
        with Locations((5, 36.5)):
            Circle(SKETCH_9_R)
    extrude(amount=-CUT_EXTRUDE_15_DEPTH, mode=Mode.SUBTRACT)

    # Вырез-Вытянуть16 outline → Вырез-Вытянуть16 (cut)
    with BuildSketch(Plane(origin=(11.3, 0, 0), x_dir=(0, 0, -1), z_dir=(1, 0, 0)).offset(CUT_EXTRUDE_START)):
        with Locations((21, 36.6)):
            Rectangle(CUT_EXTRUDE_16_OUTLINE_W, CUT_EXTRUDE_16_OUTLINE_H)
    extrude(amount=CUT_EXTRUDE_16_DEPTH, mode=Mode.SUBTRACT)


solid = part.part
